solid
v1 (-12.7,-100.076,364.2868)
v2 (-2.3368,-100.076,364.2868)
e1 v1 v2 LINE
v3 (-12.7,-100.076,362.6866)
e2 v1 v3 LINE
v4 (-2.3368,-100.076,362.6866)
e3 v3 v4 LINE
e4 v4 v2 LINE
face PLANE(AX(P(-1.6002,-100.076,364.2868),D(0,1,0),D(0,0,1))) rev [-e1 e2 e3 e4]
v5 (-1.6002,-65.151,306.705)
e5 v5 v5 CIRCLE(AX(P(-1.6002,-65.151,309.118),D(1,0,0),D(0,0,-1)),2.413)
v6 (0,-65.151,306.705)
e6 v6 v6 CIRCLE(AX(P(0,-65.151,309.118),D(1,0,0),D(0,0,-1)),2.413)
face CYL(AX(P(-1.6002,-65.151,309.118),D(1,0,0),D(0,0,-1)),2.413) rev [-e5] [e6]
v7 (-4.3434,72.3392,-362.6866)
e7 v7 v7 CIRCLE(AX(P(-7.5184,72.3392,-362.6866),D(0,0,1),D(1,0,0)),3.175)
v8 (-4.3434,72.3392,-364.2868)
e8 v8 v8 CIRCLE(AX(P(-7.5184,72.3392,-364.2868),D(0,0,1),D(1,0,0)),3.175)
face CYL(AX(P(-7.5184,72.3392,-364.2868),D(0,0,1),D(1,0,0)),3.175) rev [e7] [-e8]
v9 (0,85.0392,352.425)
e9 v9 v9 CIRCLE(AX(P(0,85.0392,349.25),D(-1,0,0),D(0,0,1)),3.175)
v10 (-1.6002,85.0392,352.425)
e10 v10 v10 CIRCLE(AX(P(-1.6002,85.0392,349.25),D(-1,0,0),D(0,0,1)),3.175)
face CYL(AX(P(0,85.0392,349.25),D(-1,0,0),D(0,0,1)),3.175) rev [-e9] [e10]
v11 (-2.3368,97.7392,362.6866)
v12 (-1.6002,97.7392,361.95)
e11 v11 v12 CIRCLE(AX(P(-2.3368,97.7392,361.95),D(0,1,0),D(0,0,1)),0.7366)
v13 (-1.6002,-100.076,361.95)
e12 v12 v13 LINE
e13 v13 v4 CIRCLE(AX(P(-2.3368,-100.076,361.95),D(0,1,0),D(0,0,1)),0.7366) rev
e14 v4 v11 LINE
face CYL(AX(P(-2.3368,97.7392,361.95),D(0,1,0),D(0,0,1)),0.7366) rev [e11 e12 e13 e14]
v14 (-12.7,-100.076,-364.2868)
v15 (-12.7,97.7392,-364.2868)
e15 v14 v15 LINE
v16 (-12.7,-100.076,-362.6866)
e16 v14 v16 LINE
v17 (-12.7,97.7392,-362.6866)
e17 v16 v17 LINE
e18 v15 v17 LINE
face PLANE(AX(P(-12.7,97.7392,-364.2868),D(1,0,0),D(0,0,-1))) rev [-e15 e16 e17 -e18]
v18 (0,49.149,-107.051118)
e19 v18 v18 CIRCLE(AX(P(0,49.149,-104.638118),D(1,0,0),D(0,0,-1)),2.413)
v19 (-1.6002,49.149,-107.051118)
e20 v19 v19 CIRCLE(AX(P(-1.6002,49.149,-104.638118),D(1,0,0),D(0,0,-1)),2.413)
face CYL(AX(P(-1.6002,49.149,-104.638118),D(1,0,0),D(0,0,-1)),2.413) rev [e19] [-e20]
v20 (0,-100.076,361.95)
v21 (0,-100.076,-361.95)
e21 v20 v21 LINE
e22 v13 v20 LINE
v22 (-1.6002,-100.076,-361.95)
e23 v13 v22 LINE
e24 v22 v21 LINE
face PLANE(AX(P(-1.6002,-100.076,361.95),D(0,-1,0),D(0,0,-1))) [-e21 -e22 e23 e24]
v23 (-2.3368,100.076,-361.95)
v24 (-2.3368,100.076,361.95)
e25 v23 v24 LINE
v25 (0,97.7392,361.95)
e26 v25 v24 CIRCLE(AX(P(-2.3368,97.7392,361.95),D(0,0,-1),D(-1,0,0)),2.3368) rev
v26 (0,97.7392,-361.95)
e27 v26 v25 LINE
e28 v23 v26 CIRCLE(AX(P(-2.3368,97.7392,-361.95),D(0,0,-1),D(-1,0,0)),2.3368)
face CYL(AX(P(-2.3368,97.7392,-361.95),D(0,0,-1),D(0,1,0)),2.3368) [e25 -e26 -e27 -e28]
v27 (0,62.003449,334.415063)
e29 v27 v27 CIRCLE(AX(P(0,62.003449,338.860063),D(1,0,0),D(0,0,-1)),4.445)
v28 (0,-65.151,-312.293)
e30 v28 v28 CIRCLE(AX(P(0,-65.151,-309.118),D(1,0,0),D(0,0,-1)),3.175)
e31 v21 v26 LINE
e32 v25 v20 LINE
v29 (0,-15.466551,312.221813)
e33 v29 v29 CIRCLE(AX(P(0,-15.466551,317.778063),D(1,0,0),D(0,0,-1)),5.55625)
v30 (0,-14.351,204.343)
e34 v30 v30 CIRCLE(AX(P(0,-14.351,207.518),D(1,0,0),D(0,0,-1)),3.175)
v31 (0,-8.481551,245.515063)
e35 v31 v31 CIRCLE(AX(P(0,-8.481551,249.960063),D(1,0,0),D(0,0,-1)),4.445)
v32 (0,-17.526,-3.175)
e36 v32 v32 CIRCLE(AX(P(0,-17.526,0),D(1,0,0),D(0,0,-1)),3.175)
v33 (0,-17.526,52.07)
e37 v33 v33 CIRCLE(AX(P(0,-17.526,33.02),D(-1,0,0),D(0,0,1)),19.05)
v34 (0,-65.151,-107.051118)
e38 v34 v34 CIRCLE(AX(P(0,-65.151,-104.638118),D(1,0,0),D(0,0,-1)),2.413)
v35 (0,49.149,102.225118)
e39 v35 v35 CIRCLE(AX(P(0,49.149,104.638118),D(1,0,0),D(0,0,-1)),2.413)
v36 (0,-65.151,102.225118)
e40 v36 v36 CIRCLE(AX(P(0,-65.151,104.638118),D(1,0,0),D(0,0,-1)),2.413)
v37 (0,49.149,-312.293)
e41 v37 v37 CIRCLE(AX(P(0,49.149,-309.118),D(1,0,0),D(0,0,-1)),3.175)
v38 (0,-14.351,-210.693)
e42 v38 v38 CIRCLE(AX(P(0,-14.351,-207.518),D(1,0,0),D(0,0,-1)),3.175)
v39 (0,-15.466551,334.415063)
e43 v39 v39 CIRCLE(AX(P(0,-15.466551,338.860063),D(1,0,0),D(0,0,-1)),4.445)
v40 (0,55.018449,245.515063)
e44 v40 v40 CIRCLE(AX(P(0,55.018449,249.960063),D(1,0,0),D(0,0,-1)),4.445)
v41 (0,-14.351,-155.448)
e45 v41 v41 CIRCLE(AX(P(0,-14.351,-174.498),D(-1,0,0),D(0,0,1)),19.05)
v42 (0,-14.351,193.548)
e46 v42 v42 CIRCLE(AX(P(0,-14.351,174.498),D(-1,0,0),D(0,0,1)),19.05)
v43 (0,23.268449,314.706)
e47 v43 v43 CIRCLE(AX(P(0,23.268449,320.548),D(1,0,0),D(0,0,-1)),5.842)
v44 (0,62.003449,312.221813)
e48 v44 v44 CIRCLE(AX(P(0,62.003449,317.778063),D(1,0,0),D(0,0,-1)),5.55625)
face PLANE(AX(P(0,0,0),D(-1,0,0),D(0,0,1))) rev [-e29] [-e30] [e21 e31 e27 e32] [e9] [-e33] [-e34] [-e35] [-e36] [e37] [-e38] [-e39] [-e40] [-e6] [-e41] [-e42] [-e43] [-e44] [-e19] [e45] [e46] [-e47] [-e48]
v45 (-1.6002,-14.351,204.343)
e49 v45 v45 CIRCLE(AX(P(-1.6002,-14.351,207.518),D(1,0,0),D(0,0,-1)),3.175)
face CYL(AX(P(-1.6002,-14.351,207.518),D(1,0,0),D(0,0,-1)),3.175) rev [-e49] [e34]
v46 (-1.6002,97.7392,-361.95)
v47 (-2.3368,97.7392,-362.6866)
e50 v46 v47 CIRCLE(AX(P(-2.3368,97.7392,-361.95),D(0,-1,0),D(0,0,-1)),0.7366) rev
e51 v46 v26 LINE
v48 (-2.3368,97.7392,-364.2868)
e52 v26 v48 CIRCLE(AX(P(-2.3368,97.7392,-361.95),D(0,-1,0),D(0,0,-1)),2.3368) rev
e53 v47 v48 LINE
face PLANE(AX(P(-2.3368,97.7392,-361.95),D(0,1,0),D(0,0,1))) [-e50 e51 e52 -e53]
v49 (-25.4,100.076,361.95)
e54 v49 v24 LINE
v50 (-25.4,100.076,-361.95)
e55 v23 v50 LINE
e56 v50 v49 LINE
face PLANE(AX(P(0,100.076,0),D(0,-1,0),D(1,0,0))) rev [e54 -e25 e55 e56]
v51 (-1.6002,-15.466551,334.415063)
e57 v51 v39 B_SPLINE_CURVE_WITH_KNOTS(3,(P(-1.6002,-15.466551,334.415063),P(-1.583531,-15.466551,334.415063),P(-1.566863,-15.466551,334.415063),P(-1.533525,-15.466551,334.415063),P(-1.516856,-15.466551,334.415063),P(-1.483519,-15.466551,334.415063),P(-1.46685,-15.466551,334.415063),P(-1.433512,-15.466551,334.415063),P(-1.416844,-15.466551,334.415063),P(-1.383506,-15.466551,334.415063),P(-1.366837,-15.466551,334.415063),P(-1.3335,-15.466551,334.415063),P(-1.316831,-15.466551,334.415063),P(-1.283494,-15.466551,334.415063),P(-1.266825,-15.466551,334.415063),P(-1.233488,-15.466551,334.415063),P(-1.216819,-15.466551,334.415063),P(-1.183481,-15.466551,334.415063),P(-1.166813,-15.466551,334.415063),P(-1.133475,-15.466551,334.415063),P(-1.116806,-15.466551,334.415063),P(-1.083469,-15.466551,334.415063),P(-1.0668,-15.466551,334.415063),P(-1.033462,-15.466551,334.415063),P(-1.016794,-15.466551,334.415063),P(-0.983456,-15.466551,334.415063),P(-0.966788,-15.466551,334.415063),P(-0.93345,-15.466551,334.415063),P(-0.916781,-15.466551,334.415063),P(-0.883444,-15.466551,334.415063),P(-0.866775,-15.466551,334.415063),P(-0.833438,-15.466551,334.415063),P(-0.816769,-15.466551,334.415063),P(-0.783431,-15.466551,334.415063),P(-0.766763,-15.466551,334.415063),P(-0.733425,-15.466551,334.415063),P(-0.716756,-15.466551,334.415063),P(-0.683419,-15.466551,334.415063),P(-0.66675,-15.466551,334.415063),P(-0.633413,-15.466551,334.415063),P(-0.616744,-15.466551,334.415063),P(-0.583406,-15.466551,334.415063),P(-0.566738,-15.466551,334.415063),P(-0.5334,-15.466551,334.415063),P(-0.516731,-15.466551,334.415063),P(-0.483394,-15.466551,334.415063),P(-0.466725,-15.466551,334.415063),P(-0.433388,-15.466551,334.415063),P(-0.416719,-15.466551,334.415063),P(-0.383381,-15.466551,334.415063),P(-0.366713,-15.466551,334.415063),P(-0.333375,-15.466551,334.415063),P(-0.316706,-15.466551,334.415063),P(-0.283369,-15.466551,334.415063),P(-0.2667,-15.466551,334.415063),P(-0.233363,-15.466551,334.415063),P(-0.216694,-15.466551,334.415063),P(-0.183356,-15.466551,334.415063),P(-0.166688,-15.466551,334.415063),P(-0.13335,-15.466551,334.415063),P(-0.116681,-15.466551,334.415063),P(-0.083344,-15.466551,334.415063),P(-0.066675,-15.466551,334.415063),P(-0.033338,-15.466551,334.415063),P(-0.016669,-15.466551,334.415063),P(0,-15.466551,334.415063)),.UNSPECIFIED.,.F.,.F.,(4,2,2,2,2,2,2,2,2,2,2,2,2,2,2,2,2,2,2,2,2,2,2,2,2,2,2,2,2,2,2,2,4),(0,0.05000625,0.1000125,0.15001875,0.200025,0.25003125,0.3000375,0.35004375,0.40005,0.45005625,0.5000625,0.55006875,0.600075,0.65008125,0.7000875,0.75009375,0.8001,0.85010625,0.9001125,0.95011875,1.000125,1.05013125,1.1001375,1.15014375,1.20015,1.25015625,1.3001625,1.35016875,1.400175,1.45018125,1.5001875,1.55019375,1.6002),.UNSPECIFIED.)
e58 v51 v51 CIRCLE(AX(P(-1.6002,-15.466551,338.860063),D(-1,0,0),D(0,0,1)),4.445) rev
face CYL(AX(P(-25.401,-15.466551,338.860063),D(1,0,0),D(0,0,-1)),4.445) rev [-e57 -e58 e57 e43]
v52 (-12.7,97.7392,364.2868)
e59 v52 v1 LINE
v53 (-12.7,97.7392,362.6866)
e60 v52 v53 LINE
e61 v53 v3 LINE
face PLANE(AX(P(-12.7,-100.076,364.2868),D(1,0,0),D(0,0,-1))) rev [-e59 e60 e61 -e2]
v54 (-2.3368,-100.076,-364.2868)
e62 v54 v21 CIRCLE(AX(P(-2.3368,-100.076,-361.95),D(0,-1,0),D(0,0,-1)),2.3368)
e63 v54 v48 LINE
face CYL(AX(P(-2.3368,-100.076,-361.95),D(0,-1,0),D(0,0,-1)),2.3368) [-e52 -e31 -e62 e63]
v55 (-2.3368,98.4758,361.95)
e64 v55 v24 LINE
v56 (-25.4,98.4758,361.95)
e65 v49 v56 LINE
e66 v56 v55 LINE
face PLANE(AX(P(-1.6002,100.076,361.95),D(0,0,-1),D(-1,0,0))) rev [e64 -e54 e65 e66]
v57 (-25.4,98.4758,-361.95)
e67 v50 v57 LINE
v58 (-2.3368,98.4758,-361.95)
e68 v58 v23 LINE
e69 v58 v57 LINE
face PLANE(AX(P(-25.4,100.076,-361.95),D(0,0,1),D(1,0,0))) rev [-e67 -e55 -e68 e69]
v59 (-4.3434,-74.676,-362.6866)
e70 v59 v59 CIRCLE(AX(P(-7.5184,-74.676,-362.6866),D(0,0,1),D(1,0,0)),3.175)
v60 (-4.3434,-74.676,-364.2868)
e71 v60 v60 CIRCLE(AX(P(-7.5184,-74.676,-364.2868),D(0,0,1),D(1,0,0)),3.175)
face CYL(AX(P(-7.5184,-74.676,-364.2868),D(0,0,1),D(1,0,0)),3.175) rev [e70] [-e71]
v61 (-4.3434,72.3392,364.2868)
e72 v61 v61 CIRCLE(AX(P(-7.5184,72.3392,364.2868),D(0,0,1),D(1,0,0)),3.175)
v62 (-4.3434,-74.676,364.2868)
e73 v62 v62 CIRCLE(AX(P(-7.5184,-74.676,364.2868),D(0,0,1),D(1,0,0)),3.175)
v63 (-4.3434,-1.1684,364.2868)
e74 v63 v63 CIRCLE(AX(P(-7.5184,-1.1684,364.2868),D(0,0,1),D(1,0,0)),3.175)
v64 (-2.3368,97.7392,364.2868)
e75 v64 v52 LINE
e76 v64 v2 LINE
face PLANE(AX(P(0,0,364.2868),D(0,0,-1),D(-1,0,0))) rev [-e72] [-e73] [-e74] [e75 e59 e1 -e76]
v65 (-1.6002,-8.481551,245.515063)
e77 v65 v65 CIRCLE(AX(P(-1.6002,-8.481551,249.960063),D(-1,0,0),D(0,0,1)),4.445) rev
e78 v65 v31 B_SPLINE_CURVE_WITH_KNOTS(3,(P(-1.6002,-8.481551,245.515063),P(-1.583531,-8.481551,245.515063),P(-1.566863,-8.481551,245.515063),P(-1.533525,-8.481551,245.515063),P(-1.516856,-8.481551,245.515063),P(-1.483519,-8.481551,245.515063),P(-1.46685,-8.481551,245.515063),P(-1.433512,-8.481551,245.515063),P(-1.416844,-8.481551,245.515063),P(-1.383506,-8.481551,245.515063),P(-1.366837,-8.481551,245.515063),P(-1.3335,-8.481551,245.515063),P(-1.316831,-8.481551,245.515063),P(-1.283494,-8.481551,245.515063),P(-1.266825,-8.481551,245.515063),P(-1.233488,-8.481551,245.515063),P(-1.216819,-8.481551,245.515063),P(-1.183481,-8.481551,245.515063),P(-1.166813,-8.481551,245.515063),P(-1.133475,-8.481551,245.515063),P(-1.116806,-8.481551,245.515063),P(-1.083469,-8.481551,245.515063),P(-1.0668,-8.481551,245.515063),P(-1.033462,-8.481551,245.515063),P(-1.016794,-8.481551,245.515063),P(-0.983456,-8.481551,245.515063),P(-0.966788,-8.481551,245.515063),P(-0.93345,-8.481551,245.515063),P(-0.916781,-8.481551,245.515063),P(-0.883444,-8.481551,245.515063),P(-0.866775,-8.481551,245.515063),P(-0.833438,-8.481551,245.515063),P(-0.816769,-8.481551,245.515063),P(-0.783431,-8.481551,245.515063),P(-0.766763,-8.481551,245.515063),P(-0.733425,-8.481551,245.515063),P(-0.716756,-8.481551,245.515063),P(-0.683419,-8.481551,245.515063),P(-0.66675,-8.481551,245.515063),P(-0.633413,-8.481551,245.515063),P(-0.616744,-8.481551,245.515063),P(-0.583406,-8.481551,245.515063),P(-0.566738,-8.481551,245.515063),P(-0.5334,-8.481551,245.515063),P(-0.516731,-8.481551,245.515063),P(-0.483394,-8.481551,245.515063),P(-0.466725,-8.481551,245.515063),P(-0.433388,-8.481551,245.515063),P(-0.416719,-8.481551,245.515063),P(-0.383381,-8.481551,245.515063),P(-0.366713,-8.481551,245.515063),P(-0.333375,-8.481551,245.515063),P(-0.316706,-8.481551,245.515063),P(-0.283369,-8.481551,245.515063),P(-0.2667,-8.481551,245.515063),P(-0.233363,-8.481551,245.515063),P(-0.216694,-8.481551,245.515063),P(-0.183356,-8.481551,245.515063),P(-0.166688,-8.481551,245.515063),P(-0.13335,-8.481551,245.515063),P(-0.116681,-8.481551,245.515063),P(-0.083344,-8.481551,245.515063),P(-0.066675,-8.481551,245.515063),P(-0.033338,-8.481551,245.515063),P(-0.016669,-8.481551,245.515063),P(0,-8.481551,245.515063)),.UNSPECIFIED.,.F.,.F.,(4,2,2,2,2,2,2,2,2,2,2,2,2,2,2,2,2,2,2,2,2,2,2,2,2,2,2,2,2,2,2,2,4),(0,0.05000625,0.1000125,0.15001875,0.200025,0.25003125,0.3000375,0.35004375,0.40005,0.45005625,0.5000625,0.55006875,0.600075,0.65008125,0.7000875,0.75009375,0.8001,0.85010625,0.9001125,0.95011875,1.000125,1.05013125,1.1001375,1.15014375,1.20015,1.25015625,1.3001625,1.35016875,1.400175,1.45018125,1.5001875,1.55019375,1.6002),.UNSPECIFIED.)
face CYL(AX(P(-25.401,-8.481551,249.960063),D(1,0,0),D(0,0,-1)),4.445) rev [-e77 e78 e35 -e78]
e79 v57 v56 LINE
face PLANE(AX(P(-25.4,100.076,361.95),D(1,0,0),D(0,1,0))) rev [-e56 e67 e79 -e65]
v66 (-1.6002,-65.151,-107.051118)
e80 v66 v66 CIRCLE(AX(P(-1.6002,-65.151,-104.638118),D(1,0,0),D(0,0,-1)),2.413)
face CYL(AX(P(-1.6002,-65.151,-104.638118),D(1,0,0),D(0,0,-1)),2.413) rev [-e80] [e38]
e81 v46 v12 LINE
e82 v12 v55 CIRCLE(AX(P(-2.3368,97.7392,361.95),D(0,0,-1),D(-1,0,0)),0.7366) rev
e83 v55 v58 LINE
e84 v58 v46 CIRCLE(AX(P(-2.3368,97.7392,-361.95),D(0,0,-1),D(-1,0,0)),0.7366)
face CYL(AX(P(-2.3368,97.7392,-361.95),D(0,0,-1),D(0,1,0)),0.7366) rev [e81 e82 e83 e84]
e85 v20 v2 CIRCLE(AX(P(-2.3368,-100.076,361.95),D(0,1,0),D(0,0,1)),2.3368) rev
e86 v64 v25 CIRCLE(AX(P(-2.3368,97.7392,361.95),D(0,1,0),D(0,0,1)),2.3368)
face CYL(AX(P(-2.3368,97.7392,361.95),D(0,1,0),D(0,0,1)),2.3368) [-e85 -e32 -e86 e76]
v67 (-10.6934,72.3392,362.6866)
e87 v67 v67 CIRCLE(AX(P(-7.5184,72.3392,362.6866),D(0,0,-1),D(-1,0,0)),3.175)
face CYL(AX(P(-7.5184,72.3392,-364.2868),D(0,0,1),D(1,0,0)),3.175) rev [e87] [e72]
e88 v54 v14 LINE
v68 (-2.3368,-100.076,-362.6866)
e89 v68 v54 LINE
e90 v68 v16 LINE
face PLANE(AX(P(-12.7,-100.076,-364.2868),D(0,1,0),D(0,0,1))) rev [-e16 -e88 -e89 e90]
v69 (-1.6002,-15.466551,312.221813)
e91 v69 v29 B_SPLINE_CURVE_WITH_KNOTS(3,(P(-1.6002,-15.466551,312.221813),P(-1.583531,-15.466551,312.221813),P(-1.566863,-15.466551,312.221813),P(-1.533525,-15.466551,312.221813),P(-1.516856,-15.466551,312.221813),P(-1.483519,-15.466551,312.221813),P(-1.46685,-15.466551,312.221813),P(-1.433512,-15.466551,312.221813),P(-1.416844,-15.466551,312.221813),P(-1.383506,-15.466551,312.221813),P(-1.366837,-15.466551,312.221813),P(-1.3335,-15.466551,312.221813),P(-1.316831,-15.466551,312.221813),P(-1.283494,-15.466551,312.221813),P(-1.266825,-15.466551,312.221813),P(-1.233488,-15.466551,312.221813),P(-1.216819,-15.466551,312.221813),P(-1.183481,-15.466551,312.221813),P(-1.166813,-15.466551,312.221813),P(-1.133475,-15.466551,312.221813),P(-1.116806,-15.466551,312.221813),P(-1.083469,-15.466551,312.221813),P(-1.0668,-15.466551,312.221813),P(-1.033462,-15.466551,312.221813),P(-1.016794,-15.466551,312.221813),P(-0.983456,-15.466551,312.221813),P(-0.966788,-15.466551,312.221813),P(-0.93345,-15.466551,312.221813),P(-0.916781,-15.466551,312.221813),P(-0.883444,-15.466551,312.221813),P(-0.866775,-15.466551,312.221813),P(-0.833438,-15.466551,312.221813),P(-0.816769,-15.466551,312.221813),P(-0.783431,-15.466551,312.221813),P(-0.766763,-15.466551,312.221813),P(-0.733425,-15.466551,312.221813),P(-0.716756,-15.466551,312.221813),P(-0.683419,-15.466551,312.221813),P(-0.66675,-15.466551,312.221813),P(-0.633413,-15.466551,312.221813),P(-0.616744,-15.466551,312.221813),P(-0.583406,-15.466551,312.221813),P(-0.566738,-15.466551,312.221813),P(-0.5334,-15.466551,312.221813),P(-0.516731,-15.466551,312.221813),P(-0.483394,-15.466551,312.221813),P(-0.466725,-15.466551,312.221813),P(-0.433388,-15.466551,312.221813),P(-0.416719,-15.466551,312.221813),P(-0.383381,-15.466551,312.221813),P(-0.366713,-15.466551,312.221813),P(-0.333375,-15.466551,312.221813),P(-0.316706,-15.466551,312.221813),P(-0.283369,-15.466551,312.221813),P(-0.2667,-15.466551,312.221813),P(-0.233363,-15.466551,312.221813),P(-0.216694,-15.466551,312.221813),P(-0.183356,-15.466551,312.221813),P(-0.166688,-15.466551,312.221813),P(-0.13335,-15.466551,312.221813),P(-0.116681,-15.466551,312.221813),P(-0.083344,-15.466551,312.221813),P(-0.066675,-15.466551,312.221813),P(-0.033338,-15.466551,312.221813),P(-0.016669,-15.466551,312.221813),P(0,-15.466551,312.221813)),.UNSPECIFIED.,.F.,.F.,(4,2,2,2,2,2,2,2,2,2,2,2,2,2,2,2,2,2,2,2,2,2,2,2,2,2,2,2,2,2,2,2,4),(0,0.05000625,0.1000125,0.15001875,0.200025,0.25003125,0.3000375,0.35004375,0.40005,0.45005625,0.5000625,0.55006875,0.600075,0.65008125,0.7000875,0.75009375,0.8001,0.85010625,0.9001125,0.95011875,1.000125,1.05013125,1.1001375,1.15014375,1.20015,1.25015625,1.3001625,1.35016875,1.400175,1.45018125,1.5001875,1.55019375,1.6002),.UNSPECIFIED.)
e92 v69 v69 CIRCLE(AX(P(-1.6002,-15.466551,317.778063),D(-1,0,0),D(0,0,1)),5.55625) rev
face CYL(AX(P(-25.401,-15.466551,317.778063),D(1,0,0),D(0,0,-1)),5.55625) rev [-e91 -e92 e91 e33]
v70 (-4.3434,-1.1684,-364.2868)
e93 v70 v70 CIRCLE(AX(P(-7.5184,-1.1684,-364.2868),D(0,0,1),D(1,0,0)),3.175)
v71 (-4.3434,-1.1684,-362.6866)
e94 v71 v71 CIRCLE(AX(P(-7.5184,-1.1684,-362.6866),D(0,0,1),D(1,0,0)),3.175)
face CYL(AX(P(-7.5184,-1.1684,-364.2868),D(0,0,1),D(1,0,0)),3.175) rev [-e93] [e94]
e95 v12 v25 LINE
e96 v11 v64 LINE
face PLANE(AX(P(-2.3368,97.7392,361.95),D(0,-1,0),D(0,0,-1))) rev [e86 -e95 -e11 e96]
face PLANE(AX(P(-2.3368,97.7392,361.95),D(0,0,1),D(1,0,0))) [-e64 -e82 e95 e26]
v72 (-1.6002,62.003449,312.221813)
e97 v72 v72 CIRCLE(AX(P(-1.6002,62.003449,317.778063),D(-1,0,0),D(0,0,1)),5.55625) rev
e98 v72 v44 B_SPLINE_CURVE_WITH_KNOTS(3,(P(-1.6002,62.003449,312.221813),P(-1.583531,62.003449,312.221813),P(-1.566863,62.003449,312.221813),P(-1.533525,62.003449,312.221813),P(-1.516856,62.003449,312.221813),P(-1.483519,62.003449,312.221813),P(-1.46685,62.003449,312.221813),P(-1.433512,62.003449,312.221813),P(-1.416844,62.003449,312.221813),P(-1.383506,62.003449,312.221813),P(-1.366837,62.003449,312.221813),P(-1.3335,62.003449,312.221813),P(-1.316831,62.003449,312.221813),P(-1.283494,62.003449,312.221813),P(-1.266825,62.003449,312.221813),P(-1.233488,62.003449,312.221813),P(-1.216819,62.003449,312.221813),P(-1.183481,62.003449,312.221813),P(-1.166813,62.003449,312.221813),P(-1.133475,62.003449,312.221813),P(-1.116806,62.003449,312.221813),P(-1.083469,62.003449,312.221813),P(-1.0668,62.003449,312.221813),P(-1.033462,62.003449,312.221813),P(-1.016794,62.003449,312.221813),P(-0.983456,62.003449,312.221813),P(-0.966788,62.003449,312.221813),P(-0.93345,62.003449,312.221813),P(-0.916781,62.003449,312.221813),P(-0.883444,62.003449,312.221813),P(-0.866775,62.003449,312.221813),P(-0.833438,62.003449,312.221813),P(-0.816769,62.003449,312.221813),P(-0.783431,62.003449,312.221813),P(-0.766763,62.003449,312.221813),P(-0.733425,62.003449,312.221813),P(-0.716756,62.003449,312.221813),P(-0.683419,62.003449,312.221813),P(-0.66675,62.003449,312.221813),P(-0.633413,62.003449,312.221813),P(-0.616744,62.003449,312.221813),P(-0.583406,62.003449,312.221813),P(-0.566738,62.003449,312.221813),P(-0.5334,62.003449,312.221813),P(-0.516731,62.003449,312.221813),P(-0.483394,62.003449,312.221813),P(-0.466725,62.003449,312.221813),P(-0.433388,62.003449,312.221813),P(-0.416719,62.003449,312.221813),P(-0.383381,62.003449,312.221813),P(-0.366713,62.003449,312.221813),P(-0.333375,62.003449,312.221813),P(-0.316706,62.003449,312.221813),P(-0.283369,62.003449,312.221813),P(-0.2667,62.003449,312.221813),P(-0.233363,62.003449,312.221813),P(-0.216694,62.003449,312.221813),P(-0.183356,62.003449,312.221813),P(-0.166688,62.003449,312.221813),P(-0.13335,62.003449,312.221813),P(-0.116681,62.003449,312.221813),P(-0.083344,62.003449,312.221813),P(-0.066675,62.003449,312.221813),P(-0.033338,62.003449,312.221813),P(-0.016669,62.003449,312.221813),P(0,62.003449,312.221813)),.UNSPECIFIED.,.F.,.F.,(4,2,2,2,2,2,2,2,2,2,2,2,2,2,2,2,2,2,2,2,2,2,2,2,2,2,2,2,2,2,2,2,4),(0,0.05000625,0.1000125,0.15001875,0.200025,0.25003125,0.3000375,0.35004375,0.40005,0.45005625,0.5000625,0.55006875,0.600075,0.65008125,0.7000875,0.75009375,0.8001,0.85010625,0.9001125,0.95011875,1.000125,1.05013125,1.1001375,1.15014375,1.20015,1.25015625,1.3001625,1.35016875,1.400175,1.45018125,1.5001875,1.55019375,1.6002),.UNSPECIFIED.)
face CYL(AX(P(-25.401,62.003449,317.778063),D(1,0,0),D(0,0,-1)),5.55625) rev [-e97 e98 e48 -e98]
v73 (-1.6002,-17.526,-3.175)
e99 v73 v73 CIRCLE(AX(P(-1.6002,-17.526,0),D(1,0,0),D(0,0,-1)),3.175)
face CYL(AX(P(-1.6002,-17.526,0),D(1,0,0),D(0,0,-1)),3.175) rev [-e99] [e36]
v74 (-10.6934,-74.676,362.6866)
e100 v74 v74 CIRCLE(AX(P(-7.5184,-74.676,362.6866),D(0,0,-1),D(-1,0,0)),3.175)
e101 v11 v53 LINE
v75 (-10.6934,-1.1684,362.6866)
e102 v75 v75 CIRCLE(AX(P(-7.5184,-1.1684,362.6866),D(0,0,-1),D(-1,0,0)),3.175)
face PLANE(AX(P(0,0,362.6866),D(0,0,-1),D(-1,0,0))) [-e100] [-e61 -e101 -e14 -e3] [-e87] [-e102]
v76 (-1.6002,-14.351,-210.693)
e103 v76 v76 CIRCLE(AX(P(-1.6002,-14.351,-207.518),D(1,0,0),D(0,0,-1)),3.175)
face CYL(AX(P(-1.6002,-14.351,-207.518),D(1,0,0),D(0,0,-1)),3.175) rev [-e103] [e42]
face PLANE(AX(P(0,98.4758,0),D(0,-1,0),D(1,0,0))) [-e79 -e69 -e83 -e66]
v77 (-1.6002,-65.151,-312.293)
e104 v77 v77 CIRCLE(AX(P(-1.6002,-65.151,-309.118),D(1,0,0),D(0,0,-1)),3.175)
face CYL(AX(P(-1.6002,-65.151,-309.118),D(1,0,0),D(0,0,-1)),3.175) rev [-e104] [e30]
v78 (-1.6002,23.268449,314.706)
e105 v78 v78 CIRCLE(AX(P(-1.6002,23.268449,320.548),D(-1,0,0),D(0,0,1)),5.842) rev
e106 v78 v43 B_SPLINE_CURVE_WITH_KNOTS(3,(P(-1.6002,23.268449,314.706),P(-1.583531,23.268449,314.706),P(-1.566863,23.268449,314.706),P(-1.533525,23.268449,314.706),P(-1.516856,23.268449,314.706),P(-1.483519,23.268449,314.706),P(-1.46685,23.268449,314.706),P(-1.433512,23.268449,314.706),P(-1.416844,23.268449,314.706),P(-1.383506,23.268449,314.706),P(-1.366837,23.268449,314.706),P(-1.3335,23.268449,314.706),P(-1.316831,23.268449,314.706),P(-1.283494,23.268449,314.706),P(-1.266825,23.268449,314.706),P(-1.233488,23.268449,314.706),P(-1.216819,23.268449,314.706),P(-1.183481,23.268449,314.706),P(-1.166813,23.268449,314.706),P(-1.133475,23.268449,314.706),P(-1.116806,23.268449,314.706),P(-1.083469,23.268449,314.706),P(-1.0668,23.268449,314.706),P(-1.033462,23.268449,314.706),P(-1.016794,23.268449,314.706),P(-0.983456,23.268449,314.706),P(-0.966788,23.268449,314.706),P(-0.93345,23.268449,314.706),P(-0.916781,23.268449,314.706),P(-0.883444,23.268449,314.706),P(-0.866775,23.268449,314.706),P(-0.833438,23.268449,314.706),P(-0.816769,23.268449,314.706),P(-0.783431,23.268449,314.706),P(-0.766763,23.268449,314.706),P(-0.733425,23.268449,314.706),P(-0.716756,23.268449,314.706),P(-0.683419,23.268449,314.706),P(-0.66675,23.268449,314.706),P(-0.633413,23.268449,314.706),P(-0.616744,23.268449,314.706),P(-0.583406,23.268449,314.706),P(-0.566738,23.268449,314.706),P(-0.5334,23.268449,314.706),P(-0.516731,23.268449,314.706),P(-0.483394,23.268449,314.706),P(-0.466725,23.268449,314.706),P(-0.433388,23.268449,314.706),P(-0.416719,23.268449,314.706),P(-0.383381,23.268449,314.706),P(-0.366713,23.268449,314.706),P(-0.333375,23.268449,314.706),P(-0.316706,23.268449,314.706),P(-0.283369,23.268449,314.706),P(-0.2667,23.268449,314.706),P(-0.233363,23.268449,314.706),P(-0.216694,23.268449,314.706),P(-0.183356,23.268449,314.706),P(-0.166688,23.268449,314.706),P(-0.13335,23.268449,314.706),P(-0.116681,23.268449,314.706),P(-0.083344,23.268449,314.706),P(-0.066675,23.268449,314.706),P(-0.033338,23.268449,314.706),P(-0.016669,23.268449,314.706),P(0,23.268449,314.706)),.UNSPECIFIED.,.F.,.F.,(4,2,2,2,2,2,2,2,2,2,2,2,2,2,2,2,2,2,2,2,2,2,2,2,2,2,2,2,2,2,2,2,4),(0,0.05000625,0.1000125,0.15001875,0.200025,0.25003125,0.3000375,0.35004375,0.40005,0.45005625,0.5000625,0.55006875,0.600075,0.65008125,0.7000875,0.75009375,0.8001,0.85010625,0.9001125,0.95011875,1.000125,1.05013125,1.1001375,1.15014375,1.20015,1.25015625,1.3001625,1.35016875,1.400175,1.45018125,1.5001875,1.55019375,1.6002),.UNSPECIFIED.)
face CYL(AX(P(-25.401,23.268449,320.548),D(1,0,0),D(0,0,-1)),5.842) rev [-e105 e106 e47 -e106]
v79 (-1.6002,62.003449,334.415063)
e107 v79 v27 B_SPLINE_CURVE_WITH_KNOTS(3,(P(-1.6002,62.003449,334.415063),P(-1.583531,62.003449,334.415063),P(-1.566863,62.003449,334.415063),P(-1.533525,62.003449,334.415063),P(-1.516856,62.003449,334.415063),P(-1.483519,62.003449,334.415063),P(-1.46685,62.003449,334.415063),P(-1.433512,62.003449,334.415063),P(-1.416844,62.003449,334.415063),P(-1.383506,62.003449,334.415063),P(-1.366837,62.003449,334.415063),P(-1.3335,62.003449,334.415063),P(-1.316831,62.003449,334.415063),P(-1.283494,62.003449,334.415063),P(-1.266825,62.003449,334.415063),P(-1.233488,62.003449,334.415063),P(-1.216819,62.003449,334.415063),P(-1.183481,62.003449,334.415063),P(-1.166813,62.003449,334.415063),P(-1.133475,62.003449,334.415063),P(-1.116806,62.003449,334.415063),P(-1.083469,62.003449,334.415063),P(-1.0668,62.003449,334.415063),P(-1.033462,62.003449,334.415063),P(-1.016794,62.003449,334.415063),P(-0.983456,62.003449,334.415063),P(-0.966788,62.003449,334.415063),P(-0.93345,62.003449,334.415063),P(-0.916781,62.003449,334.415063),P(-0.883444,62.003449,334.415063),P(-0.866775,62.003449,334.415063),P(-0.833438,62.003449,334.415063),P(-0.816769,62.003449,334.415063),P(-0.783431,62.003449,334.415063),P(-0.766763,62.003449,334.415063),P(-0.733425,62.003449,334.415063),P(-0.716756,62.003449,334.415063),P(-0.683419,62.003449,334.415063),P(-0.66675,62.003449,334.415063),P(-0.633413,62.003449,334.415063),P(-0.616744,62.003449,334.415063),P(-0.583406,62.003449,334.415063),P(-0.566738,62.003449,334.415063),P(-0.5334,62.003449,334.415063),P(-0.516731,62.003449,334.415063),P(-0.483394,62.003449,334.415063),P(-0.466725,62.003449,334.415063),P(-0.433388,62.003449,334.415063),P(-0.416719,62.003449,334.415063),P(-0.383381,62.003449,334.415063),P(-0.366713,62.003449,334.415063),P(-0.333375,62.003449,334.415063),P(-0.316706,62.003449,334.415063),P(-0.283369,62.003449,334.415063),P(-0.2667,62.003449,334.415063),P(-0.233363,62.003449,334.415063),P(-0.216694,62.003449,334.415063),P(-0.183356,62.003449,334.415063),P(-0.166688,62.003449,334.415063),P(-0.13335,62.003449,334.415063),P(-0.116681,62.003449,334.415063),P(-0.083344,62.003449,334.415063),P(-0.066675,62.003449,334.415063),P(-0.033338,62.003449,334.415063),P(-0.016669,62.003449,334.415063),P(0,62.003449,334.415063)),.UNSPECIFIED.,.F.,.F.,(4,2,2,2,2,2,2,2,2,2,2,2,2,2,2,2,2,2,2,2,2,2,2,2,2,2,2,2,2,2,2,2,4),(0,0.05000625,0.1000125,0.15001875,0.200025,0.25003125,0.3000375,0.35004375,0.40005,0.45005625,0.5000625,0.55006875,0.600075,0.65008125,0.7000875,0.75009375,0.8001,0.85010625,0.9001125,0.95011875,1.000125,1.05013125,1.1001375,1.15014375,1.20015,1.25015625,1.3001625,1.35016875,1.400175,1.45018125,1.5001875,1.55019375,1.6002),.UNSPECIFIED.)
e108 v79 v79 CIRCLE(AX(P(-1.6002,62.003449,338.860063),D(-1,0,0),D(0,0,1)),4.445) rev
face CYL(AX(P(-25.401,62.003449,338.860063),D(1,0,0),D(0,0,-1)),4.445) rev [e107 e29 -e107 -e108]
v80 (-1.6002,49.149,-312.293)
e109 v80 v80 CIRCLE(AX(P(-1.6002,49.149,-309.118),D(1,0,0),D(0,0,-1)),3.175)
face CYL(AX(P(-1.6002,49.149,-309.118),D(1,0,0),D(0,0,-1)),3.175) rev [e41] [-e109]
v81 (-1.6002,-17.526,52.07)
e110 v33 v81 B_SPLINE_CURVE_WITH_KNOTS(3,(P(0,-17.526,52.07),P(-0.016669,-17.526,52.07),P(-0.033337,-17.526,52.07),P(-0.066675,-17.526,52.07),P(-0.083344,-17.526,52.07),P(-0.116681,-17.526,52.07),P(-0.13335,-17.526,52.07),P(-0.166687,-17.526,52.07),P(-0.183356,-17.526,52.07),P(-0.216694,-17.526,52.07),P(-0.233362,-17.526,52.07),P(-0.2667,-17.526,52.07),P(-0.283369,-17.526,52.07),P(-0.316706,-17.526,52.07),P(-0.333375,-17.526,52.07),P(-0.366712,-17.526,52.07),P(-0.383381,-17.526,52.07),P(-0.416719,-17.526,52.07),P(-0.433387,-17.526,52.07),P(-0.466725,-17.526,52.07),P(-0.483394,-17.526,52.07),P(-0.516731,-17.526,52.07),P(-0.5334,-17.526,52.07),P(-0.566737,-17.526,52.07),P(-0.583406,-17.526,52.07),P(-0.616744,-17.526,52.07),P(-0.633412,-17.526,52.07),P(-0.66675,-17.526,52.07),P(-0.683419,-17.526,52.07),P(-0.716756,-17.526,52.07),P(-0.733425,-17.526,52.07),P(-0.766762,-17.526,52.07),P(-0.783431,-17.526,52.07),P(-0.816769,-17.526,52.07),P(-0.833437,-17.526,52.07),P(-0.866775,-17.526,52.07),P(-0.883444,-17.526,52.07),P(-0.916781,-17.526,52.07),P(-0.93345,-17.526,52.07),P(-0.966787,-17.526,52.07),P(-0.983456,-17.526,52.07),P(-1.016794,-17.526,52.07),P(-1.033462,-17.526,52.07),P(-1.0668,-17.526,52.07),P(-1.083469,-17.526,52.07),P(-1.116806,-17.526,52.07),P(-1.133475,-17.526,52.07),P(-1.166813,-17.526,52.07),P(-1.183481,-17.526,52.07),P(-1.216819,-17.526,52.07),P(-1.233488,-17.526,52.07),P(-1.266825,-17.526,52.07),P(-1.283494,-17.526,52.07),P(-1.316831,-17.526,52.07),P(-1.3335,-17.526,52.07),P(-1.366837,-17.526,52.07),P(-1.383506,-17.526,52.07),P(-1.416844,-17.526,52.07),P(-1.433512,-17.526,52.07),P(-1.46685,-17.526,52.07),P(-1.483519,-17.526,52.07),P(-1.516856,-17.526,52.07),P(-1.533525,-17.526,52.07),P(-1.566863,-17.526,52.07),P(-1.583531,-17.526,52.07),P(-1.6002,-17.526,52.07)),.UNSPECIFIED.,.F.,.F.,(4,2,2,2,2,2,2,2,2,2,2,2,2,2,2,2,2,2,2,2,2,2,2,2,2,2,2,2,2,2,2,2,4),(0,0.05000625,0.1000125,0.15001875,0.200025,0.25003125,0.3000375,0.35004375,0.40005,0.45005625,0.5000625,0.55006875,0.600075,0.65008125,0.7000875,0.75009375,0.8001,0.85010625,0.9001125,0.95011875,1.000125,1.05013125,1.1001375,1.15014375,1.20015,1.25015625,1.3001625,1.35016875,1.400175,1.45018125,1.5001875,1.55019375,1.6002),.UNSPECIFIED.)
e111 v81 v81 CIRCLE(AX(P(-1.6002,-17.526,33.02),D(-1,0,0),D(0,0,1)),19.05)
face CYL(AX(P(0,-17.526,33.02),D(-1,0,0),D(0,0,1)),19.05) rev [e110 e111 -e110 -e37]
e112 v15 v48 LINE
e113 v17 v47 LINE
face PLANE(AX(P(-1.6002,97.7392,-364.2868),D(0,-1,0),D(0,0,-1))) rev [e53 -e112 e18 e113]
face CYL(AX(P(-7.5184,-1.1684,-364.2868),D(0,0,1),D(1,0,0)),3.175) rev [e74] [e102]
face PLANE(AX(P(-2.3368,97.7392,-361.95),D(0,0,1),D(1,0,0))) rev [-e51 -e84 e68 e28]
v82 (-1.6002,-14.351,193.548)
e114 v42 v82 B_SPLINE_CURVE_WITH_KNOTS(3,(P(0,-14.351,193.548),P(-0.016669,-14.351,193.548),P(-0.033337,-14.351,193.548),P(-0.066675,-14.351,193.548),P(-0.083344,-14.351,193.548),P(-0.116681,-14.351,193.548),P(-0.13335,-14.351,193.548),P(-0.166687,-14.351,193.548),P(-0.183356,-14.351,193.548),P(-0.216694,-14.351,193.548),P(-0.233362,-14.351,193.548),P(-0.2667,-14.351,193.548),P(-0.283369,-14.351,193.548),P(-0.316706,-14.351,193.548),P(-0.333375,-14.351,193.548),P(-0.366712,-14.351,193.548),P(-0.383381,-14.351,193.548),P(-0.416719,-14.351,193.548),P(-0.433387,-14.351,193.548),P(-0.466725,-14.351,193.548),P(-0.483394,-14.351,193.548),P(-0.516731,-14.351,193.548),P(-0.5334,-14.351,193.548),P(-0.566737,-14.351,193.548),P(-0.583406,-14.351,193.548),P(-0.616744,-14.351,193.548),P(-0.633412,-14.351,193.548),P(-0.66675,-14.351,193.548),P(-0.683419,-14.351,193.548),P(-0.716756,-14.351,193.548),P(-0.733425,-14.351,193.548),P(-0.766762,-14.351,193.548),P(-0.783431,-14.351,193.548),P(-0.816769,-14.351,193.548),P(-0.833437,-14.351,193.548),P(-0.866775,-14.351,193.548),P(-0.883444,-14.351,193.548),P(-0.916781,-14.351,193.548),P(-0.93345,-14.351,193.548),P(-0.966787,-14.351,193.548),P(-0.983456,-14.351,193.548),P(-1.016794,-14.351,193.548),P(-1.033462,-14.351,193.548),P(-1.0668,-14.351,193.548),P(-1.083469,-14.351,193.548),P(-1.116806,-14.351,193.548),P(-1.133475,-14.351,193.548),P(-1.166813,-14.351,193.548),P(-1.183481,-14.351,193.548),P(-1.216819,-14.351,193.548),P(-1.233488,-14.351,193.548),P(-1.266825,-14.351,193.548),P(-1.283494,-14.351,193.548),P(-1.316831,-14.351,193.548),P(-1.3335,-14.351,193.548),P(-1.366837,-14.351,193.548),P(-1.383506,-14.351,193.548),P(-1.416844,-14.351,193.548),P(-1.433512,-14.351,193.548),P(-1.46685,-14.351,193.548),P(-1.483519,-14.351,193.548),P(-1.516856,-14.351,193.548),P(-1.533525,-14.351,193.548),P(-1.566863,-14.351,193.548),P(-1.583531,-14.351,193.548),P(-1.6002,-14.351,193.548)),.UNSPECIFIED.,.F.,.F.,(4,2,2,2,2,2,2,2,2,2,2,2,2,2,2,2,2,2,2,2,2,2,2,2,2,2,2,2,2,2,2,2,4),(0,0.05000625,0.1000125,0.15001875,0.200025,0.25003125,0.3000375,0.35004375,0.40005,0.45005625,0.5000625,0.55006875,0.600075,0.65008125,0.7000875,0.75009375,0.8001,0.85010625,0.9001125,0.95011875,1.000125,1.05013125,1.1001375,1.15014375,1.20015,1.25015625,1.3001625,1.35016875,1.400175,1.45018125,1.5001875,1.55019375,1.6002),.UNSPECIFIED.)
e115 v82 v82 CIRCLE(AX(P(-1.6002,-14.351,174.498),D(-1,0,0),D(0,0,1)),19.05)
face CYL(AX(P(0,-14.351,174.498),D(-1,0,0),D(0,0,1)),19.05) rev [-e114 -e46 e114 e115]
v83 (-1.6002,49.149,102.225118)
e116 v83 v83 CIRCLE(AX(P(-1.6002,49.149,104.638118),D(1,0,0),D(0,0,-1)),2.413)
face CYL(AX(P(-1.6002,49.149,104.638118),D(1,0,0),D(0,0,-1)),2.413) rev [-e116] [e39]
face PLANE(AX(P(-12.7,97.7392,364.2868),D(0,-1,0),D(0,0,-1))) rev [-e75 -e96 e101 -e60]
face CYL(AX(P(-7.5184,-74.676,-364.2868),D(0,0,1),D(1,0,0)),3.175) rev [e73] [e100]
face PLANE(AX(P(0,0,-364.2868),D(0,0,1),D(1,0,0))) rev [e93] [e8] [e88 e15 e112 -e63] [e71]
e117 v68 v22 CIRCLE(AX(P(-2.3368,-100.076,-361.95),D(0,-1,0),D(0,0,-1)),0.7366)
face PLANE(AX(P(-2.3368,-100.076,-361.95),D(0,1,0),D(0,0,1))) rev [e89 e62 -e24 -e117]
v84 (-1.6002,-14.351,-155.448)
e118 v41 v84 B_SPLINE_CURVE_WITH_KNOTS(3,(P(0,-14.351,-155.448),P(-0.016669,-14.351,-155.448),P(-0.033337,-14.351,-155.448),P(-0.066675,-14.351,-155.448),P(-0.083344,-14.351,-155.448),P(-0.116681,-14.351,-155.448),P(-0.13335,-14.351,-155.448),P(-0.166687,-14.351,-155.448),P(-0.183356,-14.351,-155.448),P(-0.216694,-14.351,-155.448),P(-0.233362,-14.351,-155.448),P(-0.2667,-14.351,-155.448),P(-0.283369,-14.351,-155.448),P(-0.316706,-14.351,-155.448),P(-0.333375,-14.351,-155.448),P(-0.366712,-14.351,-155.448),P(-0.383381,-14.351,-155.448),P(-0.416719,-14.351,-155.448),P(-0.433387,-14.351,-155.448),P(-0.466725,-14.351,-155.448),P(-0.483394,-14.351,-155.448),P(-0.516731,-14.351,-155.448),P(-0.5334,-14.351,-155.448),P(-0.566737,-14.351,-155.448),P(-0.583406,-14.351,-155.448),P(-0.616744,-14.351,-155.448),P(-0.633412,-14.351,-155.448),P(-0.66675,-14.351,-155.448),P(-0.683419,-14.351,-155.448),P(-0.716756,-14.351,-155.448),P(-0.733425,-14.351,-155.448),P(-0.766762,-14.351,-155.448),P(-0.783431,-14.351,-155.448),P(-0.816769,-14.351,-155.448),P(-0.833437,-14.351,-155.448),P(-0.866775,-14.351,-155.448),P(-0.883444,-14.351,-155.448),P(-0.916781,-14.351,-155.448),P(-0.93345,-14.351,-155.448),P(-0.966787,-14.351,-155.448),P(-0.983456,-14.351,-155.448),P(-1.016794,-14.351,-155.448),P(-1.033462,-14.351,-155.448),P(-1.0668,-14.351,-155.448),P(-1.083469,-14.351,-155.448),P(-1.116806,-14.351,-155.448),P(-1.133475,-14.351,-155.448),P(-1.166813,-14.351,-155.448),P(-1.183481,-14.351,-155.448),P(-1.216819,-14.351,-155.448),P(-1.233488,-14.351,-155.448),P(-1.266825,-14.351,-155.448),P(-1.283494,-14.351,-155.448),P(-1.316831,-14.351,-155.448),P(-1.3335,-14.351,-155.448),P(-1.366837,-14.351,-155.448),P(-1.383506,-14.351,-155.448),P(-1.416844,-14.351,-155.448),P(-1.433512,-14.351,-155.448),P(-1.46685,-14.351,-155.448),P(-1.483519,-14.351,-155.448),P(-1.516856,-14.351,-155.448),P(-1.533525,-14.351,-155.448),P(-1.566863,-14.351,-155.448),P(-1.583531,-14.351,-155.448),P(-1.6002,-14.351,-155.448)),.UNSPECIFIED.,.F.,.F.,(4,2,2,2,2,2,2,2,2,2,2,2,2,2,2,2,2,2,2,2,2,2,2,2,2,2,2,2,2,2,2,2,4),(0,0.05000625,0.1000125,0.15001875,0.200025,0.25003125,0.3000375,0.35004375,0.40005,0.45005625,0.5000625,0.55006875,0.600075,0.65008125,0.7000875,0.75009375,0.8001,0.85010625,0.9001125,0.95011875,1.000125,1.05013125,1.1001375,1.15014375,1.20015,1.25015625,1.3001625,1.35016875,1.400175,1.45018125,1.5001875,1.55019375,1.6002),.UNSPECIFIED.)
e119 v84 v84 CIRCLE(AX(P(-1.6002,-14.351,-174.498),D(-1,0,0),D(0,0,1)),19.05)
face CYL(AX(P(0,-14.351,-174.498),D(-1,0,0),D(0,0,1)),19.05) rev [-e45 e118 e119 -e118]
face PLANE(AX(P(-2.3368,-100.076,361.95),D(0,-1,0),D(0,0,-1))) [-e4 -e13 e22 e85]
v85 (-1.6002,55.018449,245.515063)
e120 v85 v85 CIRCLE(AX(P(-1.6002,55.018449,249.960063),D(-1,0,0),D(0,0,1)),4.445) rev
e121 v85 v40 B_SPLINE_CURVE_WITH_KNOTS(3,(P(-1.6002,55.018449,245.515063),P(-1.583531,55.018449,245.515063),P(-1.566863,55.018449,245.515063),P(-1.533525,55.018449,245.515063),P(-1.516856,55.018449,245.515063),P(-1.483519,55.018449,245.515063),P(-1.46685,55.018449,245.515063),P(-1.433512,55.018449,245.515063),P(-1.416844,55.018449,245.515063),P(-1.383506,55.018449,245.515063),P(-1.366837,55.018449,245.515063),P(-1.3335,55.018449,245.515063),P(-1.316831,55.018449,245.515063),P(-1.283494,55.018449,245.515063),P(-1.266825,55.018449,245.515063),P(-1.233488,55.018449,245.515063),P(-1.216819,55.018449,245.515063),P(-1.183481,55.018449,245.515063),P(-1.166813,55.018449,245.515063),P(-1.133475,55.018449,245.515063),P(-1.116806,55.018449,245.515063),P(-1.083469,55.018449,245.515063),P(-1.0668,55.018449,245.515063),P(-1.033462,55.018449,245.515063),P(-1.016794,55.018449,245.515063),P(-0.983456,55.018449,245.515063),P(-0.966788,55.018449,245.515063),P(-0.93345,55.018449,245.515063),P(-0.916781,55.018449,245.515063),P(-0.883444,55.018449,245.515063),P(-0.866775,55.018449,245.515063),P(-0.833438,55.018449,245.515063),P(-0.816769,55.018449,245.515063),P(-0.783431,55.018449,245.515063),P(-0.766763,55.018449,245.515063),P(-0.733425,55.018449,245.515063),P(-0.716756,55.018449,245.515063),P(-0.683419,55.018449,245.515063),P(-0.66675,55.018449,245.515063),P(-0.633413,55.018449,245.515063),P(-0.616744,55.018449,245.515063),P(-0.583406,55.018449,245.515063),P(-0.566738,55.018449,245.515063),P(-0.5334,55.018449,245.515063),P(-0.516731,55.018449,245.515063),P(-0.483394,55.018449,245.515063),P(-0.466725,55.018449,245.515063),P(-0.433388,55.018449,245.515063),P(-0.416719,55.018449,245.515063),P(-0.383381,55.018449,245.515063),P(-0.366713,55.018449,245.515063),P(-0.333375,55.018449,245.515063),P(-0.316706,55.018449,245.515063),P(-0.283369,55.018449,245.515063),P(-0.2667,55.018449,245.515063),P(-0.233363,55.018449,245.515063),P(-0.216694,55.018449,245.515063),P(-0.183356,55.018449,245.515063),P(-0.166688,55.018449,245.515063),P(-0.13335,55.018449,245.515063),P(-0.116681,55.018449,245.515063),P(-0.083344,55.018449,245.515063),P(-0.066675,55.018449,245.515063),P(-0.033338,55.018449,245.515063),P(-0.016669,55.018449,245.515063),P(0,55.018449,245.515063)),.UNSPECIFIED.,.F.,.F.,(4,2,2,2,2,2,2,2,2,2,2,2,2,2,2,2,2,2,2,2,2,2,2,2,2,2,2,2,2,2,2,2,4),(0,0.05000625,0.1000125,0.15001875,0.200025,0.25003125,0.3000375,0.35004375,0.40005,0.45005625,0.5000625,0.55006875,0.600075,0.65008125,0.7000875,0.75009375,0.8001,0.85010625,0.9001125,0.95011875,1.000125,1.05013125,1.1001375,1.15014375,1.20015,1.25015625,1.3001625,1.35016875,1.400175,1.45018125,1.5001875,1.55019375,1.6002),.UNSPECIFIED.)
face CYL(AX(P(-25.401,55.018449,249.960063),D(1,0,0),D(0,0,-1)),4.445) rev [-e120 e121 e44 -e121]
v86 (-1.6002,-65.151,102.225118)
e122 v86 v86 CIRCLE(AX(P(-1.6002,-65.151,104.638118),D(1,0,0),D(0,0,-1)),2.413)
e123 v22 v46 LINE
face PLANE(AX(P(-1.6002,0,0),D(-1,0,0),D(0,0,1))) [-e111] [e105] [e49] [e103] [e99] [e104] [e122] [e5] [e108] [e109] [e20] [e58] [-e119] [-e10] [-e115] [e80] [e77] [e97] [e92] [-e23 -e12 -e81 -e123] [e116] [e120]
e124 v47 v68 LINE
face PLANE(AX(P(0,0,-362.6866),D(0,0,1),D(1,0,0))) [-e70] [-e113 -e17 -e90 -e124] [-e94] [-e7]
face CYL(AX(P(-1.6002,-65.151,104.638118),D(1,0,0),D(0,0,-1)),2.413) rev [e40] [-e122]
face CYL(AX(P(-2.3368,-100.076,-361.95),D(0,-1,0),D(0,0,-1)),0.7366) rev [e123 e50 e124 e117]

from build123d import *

# Parameters (mm, degrees)
SKETCH1_W                    = 723.9
SKETCH1_H                    = 200.152
SKETCH1_R                    = 3.175
SKETCH1_R_2                  = 2.413
BASE_FLANGE1_DEPTH           = 1.6002
EDGE_FLANGE1_STRIP_W         = 7.874
EDGE_FLANGE1_STRIP_H         = 1.6002
EDGE_FLANGE1_STRIP_CUT_DEPTH = 723.9
EDGE_FLANGE1_DEPTH           = 723.9
SKETCH11_R                   = 19.05
CUT_EXTRUDE1_DEPTH           = 377.283721088
CUT_EXTRUDE3_REACH           = 378.388
SKETCH23_R                   = 5.55625
SKETCH23_R_2                 = 5.842
CUT_EXTRUDE4_REACH           = 378.388
SKETCH24_R                   = 4.445
EDGE_FLANGE2_DEPTH           = 197.8152
EDGE_FLANGE2_BEND_DEPTH      = 197.8152
SKETCH34_R                   = 3.175
CUT_EXTRUDE5_DEPTH           = 736.85314866
SKETCH35_R                   = 3.175
CUT_EXTRUDE6_DEPTH           = 379.53204476
CUT_EXTRUDE7_REACH           = 380.636
SKETCH36_R                   = 4.445


# Sheet-metal steps are written as plain solids
with BuildPart() as part:
    # Sketch1 → Base-Flange1 (new body)
    with BuildSketch(Plane(origin=(0, 0, 0), x_dir=(0, 0, -1), z_dir=(1, 0, 0))):
        Rectangle(SKETCH1_W, SKETCH1_H)
        with Locations((-207.518, -14.351)):
            Circle(SKETCH1_R, mode=Mode.SUBTRACT)
        with Locations((0, -17.526)):
            Circle(SKETCH1_R, mode=Mode.SUBTRACT)
        with Locations((207.518, -14.351)):
            Circle(SKETCH1_R, mode=Mode.SUBTRACT)
        with Locations((-104.638118017, 49.149)):
            Circle(SKETCH1_R_2, mode=Mode.SUBTRACT)
        with Locations((-104.638118017, -65.151)):
            Circle(SKETCH1_R_2, mode=Mode.SUBTRACT)
        with Locations((104.638118017, -65.151)):
            Circle(SKETCH1_R_2, mode=Mode.SUBTRACT)
        with Locations((104.638118017, 49.149)):
            Circle(SKETCH1_R_2, mode=Mode.SUBTRACT)
        with Locations((309.118, 49.149)):
            Circle(SKETCH1_R, mode=Mode.SUBTRACT)
        with Locations((309.118, -65.151)):
            Circle(SKETCH1_R, mode=Mode.SUBTRACT)
        with Locations((-309.118, -65.151)):
            Circle(SKETCH1_R_2, mode=Mode.SUBTRACT)
    extrude(amount=-BASE_FLANGE1_DEPTH)

    # Edge-Flange1 strip (across the edge) → Edge-Flange1 strip cut (cut)
    with BuildSketch(Plane(origin=(-1.6002, 100.076, 361.95), x_dir=(0, -1, 0), z_dir=(0, 0, -1))):
        with Locations((-1.6002, -0.8001)):
            Rectangle(EDGE_FLANGE1_STRIP_W, EDGE_FLANGE1_STRIP_H)
    extrude(amount=EDGE_FLANGE1_STRIP_CUT_DEPTH, mode=Mode.SUBTRACT)

    # Edge-Flange1 section (across the edge) → Edge-Flange1 (add)
    with BuildSketch(Plane(origin=(-1.6002, 100.076, 361.95), x_dir=(0, -1, 0), z_dir=(0, 0, -1))):
        with BuildLine():
            Line((0, 0.7366), (0, 23.7998))
            Line((0, 23.7998), (1.6002, 23.7998))
            Line((1.6002, 23.7998), (1.6002, 0.7366))
            ThreePointArc((1.6002, 0.7366), (1.815945145, 0.215745145), (2.3368, 0))
            Line((2.3368, 0), (2.3368, -1.6002))
            ThreePointArc((2.3368, -1.6002), (0.684432874, -0.915767126), (0, 0.7366))
        make_face()
    extrude(amount=EDGE_FLANGE1_DEPTH)

    # Sketch11 → Cut-Extrude1 (cut, through all)
    with BuildSketch(Plane.ZY.offset(1.6002)):
        with Locations((-174.498, -14.351)):
            Circle(SKETCH11_R)
        with Locations((33.02, -17.526)):
            Circle(SKETCH11_R)
        with Locations((174.498, -14.351)):
            Circle(SKETCH11_R)
    extrude(amount=-CUT_EXTRUDE1_DEPTH, mode=Mode.SUBTRACT)

    # Sketch23 → Cut-Extrude3 (cut, up to next)
    with BuildSketch(Plane(origin=(0, 0, 0), x_dir=(0, 0, -1), z_dir=(1, 0, 0)), mode=Mode.PRIVATE) as cut_extrude3_sk1:
        with Locations((-317.778063087, 62.003449438)):
            Circle(SKETCH23_R)
    cut_extrude3_tool1 = extrude(cut_extrude3_sk1.sketch, amount=-CUT_EXTRUDE3_REACH, mode=Mode.PRIVATE) & part.part
    # Sketch23 → Cut-Extrude3 (cut, up to next)
    with BuildSketch(Plane(origin=(0, 0, 0), x_dir=(0, 0, -1), z_dir=(1, 0, 0)), mode=Mode.PRIVATE) as cut_extrude3_sk2:
        with Locations((-320.548, 23.268449438)):
            Circle(SKETCH23_R_2)
    cut_extrude3_tool2 = extrude(cut_extrude3_sk2.sketch, amount=-CUT_EXTRUDE3_REACH, mode=Mode.PRIVATE) & part.part
    # Sketch23 → Cut-Extrude3 (cut, up to next)
    with BuildSketch(Plane(origin=(0, 0, 0), x_dir=(0, 0, -1), z_dir=(1, 0, 0)), mode=Mode.PRIVATE) as cut_extrude3_sk3:
        with Locations((-317.778063087, -15.466550562)):
            Circle(SKETCH23_R)
    cut_extrude3_tool3 = extrude(cut_extrude3_sk3.sketch, amount=-CUT_EXTRUDE3_REACH, mode=Mode.PRIVATE) & part.part
    add(cut_extrude3_tool1.solids().sort_by_distance((0, 62.003449, 317.778063))[0], mode=Mode.SUBTRACT)
    add(cut_extrude3_tool2.solids().sort_by_distance((0, 23.268449, 320.548))[0], mode=Mode.SUBTRACT)
    add(cut_extrude3_tool3.solids().sort_by_distance((0, -15.466551, 317.778063))[0], mode=Mode.SUBTRACT)

    # Sketch24 → Cut-Extrude4 (cut, up to next)
    with BuildSketch(Plane(origin=(0, 0, 0), x_dir=(0, 0, -1), z_dir=(1, 0, 0)), mode=Mode.PRIVATE) as cut_extrude4_sk1:
        with Locations((-338.860063087, 62.003449438)):
            Circle(SKETCH24_R)
    cut_extrude4_tool1 = extrude(cut_extrude4_sk1.sketch, amount=-CUT_EXTRUDE4_REACH, mode=Mode.PRIVATE) & part.part
    # Sketch24 → Cut-Extrude4 (cut, up to next)
    with BuildSketch(Plane(origin=(0, 0, 0), x_dir=(0, 0, -1), z_dir=(1, 0, 0)), mode=Mode.PRIVATE) as cut_extrude4_sk2:
        with Locations((-338.860063087, -15.466550562)):
            Circle(SKETCH24_R)
    cut_extrude4_tool2 = extrude(cut_extrude4_sk2.sketch, amount=-CUT_EXTRUDE4_REACH, mode=Mode.PRIVATE) & part.part
    add(cut_extrude4_tool1.solids().sort_by_distance((0, 62.003449, 338.860063))[0], mode=Mode.SUBTRACT)
    add(cut_extrude4_tool2.solids().sort_by_distance((0, -15.466551, 338.860063))[0], mode=Mode.SUBTRACT)

    # Edge-Flange2 section (across the edge) → Edge-Flange2 (add)
    with BuildSketch(Plane(origin=(-1.6002, 97.7392, -362.6866), x_dir=(0, 0, 1), z_dir=(0, -1, 0))):
        with BuildLine():
            Line((-1.6002, 0.7366), (-1.6002, 11.0998))
            Line((-1.6002, 11.0998), (0, 11.0998))
            Line((0, 11.0998), (0, 0.7366))
            ThreePointArc((0, 0.7366), (0.215745145, 0.215745145), (0.7366, 0))
            Line((0.7366, 0), (0.7366, -1.6002))
            ThreePointArc((0.7366, -1.6002), (-0.915767126, -0.915767126), (-1.6002, 0.7366))
        make_face()
    extrude(amount=EDGE_FLANGE2_DEPTH)

    # Edge-Flange2 section 2 (across the edge) → Edge-Flange2 bend (add)
    with BuildSketch(Plane(origin=(-1.6002, -100.076, 362.6866), x_dir=(0, 0, -1), z_dir=(0, 1, 0))):
        with BuildLine():
            Line((-1.6002, 0.7366), (-1.6002, 11.0998))
            Line((-1.6002, 11.0998), (0, 11.0998))
            Line((0, 11.0998), (0, 0.7366))
            ThreePointArc((0, 0.7366), (0.215745145, 0.215745145), (0.7366, 0))
            Line((0.7366, 0), (0.7366, -1.6002))
            ThreePointArc((0.7366, -1.6002), (-0.915767126, -0.915767126), (-1.6002, 0.7366))
        make_face()
    extrude(amount=EDGE_FLANGE2_BEND_DEPTH)

    # Sketch34 → Cut-Extrude5 (cut, through all)
    with BuildSketch(Plane.XY.offset(364.2868)):
        with Locations((-7.5184, 72.3392)):
            Circle(SKETCH34_R)
        with Locations((-7.5184, -1.1684)):
            Circle(SKETCH34_R)
        with Locations((-7.5184, -74.676)):
            Circle(SKETCH34_R)
    extrude(amount=-CUT_EXTRUDE5_DEPTH, mode=Mode.SUBTRACT)

    # Sketch35 → Cut-Extrude6 (cut, through all)
    with BuildSketch(Plane.ZY.offset(1.6002)):
        with Locations((349.25, 85.0392)):
            Circle(SKETCH35_R)
    extrude(amount=-CUT_EXTRUDE6_DEPTH, mode=Mode.SUBTRACT)

    # Sketch36 → Cut-Extrude7 (cut, up to next)
    with BuildSketch(Plane(origin=(0, 0, 0), x_dir=(0, 0, -1), z_dir=(1, 0, 0)), mode=Mode.PRIVATE) as cut_extrude7_sk1:
        with Locations((-249.960063087, 55.018449438)):
            Circle(SKETCH36_R)
    cut_extrude7_tool1 = extrude(cut_extrude7_sk1.sketch, amount=-CUT_EXTRUDE7_REACH, mode=Mode.PRIVATE) & part.part
    # Sketch36 → Cut-Extrude7 (cut, up to next)
    with BuildSketch(Plane(origin=(0, 0, 0), x_dir=(0, 0, -1), z_dir=(1, 0, 0)), mode=Mode.PRIVATE) as cut_extrude7_sk2:
        with Locations((-249.960063087, -8.481550562)):
            Circle(SKETCH36_R)
    cut_extrude7_tool2 = extrude(cut_extrude7_sk2.sketch, amount=-CUT_EXTRUDE7_REACH, mode=Mode.PRIVATE) & part.part
    add(cut_extrude7_tool1.solids().sort_by_distance((0, 55.018449, 249.960063))[0], mode=Mode.SUBTRACT)
    add(cut_extrude7_tool2.solids().sort_by_distance((0, -8.481551, 249.960063))[0], mode=Mode.SUBTRACT)


solid = part.part
